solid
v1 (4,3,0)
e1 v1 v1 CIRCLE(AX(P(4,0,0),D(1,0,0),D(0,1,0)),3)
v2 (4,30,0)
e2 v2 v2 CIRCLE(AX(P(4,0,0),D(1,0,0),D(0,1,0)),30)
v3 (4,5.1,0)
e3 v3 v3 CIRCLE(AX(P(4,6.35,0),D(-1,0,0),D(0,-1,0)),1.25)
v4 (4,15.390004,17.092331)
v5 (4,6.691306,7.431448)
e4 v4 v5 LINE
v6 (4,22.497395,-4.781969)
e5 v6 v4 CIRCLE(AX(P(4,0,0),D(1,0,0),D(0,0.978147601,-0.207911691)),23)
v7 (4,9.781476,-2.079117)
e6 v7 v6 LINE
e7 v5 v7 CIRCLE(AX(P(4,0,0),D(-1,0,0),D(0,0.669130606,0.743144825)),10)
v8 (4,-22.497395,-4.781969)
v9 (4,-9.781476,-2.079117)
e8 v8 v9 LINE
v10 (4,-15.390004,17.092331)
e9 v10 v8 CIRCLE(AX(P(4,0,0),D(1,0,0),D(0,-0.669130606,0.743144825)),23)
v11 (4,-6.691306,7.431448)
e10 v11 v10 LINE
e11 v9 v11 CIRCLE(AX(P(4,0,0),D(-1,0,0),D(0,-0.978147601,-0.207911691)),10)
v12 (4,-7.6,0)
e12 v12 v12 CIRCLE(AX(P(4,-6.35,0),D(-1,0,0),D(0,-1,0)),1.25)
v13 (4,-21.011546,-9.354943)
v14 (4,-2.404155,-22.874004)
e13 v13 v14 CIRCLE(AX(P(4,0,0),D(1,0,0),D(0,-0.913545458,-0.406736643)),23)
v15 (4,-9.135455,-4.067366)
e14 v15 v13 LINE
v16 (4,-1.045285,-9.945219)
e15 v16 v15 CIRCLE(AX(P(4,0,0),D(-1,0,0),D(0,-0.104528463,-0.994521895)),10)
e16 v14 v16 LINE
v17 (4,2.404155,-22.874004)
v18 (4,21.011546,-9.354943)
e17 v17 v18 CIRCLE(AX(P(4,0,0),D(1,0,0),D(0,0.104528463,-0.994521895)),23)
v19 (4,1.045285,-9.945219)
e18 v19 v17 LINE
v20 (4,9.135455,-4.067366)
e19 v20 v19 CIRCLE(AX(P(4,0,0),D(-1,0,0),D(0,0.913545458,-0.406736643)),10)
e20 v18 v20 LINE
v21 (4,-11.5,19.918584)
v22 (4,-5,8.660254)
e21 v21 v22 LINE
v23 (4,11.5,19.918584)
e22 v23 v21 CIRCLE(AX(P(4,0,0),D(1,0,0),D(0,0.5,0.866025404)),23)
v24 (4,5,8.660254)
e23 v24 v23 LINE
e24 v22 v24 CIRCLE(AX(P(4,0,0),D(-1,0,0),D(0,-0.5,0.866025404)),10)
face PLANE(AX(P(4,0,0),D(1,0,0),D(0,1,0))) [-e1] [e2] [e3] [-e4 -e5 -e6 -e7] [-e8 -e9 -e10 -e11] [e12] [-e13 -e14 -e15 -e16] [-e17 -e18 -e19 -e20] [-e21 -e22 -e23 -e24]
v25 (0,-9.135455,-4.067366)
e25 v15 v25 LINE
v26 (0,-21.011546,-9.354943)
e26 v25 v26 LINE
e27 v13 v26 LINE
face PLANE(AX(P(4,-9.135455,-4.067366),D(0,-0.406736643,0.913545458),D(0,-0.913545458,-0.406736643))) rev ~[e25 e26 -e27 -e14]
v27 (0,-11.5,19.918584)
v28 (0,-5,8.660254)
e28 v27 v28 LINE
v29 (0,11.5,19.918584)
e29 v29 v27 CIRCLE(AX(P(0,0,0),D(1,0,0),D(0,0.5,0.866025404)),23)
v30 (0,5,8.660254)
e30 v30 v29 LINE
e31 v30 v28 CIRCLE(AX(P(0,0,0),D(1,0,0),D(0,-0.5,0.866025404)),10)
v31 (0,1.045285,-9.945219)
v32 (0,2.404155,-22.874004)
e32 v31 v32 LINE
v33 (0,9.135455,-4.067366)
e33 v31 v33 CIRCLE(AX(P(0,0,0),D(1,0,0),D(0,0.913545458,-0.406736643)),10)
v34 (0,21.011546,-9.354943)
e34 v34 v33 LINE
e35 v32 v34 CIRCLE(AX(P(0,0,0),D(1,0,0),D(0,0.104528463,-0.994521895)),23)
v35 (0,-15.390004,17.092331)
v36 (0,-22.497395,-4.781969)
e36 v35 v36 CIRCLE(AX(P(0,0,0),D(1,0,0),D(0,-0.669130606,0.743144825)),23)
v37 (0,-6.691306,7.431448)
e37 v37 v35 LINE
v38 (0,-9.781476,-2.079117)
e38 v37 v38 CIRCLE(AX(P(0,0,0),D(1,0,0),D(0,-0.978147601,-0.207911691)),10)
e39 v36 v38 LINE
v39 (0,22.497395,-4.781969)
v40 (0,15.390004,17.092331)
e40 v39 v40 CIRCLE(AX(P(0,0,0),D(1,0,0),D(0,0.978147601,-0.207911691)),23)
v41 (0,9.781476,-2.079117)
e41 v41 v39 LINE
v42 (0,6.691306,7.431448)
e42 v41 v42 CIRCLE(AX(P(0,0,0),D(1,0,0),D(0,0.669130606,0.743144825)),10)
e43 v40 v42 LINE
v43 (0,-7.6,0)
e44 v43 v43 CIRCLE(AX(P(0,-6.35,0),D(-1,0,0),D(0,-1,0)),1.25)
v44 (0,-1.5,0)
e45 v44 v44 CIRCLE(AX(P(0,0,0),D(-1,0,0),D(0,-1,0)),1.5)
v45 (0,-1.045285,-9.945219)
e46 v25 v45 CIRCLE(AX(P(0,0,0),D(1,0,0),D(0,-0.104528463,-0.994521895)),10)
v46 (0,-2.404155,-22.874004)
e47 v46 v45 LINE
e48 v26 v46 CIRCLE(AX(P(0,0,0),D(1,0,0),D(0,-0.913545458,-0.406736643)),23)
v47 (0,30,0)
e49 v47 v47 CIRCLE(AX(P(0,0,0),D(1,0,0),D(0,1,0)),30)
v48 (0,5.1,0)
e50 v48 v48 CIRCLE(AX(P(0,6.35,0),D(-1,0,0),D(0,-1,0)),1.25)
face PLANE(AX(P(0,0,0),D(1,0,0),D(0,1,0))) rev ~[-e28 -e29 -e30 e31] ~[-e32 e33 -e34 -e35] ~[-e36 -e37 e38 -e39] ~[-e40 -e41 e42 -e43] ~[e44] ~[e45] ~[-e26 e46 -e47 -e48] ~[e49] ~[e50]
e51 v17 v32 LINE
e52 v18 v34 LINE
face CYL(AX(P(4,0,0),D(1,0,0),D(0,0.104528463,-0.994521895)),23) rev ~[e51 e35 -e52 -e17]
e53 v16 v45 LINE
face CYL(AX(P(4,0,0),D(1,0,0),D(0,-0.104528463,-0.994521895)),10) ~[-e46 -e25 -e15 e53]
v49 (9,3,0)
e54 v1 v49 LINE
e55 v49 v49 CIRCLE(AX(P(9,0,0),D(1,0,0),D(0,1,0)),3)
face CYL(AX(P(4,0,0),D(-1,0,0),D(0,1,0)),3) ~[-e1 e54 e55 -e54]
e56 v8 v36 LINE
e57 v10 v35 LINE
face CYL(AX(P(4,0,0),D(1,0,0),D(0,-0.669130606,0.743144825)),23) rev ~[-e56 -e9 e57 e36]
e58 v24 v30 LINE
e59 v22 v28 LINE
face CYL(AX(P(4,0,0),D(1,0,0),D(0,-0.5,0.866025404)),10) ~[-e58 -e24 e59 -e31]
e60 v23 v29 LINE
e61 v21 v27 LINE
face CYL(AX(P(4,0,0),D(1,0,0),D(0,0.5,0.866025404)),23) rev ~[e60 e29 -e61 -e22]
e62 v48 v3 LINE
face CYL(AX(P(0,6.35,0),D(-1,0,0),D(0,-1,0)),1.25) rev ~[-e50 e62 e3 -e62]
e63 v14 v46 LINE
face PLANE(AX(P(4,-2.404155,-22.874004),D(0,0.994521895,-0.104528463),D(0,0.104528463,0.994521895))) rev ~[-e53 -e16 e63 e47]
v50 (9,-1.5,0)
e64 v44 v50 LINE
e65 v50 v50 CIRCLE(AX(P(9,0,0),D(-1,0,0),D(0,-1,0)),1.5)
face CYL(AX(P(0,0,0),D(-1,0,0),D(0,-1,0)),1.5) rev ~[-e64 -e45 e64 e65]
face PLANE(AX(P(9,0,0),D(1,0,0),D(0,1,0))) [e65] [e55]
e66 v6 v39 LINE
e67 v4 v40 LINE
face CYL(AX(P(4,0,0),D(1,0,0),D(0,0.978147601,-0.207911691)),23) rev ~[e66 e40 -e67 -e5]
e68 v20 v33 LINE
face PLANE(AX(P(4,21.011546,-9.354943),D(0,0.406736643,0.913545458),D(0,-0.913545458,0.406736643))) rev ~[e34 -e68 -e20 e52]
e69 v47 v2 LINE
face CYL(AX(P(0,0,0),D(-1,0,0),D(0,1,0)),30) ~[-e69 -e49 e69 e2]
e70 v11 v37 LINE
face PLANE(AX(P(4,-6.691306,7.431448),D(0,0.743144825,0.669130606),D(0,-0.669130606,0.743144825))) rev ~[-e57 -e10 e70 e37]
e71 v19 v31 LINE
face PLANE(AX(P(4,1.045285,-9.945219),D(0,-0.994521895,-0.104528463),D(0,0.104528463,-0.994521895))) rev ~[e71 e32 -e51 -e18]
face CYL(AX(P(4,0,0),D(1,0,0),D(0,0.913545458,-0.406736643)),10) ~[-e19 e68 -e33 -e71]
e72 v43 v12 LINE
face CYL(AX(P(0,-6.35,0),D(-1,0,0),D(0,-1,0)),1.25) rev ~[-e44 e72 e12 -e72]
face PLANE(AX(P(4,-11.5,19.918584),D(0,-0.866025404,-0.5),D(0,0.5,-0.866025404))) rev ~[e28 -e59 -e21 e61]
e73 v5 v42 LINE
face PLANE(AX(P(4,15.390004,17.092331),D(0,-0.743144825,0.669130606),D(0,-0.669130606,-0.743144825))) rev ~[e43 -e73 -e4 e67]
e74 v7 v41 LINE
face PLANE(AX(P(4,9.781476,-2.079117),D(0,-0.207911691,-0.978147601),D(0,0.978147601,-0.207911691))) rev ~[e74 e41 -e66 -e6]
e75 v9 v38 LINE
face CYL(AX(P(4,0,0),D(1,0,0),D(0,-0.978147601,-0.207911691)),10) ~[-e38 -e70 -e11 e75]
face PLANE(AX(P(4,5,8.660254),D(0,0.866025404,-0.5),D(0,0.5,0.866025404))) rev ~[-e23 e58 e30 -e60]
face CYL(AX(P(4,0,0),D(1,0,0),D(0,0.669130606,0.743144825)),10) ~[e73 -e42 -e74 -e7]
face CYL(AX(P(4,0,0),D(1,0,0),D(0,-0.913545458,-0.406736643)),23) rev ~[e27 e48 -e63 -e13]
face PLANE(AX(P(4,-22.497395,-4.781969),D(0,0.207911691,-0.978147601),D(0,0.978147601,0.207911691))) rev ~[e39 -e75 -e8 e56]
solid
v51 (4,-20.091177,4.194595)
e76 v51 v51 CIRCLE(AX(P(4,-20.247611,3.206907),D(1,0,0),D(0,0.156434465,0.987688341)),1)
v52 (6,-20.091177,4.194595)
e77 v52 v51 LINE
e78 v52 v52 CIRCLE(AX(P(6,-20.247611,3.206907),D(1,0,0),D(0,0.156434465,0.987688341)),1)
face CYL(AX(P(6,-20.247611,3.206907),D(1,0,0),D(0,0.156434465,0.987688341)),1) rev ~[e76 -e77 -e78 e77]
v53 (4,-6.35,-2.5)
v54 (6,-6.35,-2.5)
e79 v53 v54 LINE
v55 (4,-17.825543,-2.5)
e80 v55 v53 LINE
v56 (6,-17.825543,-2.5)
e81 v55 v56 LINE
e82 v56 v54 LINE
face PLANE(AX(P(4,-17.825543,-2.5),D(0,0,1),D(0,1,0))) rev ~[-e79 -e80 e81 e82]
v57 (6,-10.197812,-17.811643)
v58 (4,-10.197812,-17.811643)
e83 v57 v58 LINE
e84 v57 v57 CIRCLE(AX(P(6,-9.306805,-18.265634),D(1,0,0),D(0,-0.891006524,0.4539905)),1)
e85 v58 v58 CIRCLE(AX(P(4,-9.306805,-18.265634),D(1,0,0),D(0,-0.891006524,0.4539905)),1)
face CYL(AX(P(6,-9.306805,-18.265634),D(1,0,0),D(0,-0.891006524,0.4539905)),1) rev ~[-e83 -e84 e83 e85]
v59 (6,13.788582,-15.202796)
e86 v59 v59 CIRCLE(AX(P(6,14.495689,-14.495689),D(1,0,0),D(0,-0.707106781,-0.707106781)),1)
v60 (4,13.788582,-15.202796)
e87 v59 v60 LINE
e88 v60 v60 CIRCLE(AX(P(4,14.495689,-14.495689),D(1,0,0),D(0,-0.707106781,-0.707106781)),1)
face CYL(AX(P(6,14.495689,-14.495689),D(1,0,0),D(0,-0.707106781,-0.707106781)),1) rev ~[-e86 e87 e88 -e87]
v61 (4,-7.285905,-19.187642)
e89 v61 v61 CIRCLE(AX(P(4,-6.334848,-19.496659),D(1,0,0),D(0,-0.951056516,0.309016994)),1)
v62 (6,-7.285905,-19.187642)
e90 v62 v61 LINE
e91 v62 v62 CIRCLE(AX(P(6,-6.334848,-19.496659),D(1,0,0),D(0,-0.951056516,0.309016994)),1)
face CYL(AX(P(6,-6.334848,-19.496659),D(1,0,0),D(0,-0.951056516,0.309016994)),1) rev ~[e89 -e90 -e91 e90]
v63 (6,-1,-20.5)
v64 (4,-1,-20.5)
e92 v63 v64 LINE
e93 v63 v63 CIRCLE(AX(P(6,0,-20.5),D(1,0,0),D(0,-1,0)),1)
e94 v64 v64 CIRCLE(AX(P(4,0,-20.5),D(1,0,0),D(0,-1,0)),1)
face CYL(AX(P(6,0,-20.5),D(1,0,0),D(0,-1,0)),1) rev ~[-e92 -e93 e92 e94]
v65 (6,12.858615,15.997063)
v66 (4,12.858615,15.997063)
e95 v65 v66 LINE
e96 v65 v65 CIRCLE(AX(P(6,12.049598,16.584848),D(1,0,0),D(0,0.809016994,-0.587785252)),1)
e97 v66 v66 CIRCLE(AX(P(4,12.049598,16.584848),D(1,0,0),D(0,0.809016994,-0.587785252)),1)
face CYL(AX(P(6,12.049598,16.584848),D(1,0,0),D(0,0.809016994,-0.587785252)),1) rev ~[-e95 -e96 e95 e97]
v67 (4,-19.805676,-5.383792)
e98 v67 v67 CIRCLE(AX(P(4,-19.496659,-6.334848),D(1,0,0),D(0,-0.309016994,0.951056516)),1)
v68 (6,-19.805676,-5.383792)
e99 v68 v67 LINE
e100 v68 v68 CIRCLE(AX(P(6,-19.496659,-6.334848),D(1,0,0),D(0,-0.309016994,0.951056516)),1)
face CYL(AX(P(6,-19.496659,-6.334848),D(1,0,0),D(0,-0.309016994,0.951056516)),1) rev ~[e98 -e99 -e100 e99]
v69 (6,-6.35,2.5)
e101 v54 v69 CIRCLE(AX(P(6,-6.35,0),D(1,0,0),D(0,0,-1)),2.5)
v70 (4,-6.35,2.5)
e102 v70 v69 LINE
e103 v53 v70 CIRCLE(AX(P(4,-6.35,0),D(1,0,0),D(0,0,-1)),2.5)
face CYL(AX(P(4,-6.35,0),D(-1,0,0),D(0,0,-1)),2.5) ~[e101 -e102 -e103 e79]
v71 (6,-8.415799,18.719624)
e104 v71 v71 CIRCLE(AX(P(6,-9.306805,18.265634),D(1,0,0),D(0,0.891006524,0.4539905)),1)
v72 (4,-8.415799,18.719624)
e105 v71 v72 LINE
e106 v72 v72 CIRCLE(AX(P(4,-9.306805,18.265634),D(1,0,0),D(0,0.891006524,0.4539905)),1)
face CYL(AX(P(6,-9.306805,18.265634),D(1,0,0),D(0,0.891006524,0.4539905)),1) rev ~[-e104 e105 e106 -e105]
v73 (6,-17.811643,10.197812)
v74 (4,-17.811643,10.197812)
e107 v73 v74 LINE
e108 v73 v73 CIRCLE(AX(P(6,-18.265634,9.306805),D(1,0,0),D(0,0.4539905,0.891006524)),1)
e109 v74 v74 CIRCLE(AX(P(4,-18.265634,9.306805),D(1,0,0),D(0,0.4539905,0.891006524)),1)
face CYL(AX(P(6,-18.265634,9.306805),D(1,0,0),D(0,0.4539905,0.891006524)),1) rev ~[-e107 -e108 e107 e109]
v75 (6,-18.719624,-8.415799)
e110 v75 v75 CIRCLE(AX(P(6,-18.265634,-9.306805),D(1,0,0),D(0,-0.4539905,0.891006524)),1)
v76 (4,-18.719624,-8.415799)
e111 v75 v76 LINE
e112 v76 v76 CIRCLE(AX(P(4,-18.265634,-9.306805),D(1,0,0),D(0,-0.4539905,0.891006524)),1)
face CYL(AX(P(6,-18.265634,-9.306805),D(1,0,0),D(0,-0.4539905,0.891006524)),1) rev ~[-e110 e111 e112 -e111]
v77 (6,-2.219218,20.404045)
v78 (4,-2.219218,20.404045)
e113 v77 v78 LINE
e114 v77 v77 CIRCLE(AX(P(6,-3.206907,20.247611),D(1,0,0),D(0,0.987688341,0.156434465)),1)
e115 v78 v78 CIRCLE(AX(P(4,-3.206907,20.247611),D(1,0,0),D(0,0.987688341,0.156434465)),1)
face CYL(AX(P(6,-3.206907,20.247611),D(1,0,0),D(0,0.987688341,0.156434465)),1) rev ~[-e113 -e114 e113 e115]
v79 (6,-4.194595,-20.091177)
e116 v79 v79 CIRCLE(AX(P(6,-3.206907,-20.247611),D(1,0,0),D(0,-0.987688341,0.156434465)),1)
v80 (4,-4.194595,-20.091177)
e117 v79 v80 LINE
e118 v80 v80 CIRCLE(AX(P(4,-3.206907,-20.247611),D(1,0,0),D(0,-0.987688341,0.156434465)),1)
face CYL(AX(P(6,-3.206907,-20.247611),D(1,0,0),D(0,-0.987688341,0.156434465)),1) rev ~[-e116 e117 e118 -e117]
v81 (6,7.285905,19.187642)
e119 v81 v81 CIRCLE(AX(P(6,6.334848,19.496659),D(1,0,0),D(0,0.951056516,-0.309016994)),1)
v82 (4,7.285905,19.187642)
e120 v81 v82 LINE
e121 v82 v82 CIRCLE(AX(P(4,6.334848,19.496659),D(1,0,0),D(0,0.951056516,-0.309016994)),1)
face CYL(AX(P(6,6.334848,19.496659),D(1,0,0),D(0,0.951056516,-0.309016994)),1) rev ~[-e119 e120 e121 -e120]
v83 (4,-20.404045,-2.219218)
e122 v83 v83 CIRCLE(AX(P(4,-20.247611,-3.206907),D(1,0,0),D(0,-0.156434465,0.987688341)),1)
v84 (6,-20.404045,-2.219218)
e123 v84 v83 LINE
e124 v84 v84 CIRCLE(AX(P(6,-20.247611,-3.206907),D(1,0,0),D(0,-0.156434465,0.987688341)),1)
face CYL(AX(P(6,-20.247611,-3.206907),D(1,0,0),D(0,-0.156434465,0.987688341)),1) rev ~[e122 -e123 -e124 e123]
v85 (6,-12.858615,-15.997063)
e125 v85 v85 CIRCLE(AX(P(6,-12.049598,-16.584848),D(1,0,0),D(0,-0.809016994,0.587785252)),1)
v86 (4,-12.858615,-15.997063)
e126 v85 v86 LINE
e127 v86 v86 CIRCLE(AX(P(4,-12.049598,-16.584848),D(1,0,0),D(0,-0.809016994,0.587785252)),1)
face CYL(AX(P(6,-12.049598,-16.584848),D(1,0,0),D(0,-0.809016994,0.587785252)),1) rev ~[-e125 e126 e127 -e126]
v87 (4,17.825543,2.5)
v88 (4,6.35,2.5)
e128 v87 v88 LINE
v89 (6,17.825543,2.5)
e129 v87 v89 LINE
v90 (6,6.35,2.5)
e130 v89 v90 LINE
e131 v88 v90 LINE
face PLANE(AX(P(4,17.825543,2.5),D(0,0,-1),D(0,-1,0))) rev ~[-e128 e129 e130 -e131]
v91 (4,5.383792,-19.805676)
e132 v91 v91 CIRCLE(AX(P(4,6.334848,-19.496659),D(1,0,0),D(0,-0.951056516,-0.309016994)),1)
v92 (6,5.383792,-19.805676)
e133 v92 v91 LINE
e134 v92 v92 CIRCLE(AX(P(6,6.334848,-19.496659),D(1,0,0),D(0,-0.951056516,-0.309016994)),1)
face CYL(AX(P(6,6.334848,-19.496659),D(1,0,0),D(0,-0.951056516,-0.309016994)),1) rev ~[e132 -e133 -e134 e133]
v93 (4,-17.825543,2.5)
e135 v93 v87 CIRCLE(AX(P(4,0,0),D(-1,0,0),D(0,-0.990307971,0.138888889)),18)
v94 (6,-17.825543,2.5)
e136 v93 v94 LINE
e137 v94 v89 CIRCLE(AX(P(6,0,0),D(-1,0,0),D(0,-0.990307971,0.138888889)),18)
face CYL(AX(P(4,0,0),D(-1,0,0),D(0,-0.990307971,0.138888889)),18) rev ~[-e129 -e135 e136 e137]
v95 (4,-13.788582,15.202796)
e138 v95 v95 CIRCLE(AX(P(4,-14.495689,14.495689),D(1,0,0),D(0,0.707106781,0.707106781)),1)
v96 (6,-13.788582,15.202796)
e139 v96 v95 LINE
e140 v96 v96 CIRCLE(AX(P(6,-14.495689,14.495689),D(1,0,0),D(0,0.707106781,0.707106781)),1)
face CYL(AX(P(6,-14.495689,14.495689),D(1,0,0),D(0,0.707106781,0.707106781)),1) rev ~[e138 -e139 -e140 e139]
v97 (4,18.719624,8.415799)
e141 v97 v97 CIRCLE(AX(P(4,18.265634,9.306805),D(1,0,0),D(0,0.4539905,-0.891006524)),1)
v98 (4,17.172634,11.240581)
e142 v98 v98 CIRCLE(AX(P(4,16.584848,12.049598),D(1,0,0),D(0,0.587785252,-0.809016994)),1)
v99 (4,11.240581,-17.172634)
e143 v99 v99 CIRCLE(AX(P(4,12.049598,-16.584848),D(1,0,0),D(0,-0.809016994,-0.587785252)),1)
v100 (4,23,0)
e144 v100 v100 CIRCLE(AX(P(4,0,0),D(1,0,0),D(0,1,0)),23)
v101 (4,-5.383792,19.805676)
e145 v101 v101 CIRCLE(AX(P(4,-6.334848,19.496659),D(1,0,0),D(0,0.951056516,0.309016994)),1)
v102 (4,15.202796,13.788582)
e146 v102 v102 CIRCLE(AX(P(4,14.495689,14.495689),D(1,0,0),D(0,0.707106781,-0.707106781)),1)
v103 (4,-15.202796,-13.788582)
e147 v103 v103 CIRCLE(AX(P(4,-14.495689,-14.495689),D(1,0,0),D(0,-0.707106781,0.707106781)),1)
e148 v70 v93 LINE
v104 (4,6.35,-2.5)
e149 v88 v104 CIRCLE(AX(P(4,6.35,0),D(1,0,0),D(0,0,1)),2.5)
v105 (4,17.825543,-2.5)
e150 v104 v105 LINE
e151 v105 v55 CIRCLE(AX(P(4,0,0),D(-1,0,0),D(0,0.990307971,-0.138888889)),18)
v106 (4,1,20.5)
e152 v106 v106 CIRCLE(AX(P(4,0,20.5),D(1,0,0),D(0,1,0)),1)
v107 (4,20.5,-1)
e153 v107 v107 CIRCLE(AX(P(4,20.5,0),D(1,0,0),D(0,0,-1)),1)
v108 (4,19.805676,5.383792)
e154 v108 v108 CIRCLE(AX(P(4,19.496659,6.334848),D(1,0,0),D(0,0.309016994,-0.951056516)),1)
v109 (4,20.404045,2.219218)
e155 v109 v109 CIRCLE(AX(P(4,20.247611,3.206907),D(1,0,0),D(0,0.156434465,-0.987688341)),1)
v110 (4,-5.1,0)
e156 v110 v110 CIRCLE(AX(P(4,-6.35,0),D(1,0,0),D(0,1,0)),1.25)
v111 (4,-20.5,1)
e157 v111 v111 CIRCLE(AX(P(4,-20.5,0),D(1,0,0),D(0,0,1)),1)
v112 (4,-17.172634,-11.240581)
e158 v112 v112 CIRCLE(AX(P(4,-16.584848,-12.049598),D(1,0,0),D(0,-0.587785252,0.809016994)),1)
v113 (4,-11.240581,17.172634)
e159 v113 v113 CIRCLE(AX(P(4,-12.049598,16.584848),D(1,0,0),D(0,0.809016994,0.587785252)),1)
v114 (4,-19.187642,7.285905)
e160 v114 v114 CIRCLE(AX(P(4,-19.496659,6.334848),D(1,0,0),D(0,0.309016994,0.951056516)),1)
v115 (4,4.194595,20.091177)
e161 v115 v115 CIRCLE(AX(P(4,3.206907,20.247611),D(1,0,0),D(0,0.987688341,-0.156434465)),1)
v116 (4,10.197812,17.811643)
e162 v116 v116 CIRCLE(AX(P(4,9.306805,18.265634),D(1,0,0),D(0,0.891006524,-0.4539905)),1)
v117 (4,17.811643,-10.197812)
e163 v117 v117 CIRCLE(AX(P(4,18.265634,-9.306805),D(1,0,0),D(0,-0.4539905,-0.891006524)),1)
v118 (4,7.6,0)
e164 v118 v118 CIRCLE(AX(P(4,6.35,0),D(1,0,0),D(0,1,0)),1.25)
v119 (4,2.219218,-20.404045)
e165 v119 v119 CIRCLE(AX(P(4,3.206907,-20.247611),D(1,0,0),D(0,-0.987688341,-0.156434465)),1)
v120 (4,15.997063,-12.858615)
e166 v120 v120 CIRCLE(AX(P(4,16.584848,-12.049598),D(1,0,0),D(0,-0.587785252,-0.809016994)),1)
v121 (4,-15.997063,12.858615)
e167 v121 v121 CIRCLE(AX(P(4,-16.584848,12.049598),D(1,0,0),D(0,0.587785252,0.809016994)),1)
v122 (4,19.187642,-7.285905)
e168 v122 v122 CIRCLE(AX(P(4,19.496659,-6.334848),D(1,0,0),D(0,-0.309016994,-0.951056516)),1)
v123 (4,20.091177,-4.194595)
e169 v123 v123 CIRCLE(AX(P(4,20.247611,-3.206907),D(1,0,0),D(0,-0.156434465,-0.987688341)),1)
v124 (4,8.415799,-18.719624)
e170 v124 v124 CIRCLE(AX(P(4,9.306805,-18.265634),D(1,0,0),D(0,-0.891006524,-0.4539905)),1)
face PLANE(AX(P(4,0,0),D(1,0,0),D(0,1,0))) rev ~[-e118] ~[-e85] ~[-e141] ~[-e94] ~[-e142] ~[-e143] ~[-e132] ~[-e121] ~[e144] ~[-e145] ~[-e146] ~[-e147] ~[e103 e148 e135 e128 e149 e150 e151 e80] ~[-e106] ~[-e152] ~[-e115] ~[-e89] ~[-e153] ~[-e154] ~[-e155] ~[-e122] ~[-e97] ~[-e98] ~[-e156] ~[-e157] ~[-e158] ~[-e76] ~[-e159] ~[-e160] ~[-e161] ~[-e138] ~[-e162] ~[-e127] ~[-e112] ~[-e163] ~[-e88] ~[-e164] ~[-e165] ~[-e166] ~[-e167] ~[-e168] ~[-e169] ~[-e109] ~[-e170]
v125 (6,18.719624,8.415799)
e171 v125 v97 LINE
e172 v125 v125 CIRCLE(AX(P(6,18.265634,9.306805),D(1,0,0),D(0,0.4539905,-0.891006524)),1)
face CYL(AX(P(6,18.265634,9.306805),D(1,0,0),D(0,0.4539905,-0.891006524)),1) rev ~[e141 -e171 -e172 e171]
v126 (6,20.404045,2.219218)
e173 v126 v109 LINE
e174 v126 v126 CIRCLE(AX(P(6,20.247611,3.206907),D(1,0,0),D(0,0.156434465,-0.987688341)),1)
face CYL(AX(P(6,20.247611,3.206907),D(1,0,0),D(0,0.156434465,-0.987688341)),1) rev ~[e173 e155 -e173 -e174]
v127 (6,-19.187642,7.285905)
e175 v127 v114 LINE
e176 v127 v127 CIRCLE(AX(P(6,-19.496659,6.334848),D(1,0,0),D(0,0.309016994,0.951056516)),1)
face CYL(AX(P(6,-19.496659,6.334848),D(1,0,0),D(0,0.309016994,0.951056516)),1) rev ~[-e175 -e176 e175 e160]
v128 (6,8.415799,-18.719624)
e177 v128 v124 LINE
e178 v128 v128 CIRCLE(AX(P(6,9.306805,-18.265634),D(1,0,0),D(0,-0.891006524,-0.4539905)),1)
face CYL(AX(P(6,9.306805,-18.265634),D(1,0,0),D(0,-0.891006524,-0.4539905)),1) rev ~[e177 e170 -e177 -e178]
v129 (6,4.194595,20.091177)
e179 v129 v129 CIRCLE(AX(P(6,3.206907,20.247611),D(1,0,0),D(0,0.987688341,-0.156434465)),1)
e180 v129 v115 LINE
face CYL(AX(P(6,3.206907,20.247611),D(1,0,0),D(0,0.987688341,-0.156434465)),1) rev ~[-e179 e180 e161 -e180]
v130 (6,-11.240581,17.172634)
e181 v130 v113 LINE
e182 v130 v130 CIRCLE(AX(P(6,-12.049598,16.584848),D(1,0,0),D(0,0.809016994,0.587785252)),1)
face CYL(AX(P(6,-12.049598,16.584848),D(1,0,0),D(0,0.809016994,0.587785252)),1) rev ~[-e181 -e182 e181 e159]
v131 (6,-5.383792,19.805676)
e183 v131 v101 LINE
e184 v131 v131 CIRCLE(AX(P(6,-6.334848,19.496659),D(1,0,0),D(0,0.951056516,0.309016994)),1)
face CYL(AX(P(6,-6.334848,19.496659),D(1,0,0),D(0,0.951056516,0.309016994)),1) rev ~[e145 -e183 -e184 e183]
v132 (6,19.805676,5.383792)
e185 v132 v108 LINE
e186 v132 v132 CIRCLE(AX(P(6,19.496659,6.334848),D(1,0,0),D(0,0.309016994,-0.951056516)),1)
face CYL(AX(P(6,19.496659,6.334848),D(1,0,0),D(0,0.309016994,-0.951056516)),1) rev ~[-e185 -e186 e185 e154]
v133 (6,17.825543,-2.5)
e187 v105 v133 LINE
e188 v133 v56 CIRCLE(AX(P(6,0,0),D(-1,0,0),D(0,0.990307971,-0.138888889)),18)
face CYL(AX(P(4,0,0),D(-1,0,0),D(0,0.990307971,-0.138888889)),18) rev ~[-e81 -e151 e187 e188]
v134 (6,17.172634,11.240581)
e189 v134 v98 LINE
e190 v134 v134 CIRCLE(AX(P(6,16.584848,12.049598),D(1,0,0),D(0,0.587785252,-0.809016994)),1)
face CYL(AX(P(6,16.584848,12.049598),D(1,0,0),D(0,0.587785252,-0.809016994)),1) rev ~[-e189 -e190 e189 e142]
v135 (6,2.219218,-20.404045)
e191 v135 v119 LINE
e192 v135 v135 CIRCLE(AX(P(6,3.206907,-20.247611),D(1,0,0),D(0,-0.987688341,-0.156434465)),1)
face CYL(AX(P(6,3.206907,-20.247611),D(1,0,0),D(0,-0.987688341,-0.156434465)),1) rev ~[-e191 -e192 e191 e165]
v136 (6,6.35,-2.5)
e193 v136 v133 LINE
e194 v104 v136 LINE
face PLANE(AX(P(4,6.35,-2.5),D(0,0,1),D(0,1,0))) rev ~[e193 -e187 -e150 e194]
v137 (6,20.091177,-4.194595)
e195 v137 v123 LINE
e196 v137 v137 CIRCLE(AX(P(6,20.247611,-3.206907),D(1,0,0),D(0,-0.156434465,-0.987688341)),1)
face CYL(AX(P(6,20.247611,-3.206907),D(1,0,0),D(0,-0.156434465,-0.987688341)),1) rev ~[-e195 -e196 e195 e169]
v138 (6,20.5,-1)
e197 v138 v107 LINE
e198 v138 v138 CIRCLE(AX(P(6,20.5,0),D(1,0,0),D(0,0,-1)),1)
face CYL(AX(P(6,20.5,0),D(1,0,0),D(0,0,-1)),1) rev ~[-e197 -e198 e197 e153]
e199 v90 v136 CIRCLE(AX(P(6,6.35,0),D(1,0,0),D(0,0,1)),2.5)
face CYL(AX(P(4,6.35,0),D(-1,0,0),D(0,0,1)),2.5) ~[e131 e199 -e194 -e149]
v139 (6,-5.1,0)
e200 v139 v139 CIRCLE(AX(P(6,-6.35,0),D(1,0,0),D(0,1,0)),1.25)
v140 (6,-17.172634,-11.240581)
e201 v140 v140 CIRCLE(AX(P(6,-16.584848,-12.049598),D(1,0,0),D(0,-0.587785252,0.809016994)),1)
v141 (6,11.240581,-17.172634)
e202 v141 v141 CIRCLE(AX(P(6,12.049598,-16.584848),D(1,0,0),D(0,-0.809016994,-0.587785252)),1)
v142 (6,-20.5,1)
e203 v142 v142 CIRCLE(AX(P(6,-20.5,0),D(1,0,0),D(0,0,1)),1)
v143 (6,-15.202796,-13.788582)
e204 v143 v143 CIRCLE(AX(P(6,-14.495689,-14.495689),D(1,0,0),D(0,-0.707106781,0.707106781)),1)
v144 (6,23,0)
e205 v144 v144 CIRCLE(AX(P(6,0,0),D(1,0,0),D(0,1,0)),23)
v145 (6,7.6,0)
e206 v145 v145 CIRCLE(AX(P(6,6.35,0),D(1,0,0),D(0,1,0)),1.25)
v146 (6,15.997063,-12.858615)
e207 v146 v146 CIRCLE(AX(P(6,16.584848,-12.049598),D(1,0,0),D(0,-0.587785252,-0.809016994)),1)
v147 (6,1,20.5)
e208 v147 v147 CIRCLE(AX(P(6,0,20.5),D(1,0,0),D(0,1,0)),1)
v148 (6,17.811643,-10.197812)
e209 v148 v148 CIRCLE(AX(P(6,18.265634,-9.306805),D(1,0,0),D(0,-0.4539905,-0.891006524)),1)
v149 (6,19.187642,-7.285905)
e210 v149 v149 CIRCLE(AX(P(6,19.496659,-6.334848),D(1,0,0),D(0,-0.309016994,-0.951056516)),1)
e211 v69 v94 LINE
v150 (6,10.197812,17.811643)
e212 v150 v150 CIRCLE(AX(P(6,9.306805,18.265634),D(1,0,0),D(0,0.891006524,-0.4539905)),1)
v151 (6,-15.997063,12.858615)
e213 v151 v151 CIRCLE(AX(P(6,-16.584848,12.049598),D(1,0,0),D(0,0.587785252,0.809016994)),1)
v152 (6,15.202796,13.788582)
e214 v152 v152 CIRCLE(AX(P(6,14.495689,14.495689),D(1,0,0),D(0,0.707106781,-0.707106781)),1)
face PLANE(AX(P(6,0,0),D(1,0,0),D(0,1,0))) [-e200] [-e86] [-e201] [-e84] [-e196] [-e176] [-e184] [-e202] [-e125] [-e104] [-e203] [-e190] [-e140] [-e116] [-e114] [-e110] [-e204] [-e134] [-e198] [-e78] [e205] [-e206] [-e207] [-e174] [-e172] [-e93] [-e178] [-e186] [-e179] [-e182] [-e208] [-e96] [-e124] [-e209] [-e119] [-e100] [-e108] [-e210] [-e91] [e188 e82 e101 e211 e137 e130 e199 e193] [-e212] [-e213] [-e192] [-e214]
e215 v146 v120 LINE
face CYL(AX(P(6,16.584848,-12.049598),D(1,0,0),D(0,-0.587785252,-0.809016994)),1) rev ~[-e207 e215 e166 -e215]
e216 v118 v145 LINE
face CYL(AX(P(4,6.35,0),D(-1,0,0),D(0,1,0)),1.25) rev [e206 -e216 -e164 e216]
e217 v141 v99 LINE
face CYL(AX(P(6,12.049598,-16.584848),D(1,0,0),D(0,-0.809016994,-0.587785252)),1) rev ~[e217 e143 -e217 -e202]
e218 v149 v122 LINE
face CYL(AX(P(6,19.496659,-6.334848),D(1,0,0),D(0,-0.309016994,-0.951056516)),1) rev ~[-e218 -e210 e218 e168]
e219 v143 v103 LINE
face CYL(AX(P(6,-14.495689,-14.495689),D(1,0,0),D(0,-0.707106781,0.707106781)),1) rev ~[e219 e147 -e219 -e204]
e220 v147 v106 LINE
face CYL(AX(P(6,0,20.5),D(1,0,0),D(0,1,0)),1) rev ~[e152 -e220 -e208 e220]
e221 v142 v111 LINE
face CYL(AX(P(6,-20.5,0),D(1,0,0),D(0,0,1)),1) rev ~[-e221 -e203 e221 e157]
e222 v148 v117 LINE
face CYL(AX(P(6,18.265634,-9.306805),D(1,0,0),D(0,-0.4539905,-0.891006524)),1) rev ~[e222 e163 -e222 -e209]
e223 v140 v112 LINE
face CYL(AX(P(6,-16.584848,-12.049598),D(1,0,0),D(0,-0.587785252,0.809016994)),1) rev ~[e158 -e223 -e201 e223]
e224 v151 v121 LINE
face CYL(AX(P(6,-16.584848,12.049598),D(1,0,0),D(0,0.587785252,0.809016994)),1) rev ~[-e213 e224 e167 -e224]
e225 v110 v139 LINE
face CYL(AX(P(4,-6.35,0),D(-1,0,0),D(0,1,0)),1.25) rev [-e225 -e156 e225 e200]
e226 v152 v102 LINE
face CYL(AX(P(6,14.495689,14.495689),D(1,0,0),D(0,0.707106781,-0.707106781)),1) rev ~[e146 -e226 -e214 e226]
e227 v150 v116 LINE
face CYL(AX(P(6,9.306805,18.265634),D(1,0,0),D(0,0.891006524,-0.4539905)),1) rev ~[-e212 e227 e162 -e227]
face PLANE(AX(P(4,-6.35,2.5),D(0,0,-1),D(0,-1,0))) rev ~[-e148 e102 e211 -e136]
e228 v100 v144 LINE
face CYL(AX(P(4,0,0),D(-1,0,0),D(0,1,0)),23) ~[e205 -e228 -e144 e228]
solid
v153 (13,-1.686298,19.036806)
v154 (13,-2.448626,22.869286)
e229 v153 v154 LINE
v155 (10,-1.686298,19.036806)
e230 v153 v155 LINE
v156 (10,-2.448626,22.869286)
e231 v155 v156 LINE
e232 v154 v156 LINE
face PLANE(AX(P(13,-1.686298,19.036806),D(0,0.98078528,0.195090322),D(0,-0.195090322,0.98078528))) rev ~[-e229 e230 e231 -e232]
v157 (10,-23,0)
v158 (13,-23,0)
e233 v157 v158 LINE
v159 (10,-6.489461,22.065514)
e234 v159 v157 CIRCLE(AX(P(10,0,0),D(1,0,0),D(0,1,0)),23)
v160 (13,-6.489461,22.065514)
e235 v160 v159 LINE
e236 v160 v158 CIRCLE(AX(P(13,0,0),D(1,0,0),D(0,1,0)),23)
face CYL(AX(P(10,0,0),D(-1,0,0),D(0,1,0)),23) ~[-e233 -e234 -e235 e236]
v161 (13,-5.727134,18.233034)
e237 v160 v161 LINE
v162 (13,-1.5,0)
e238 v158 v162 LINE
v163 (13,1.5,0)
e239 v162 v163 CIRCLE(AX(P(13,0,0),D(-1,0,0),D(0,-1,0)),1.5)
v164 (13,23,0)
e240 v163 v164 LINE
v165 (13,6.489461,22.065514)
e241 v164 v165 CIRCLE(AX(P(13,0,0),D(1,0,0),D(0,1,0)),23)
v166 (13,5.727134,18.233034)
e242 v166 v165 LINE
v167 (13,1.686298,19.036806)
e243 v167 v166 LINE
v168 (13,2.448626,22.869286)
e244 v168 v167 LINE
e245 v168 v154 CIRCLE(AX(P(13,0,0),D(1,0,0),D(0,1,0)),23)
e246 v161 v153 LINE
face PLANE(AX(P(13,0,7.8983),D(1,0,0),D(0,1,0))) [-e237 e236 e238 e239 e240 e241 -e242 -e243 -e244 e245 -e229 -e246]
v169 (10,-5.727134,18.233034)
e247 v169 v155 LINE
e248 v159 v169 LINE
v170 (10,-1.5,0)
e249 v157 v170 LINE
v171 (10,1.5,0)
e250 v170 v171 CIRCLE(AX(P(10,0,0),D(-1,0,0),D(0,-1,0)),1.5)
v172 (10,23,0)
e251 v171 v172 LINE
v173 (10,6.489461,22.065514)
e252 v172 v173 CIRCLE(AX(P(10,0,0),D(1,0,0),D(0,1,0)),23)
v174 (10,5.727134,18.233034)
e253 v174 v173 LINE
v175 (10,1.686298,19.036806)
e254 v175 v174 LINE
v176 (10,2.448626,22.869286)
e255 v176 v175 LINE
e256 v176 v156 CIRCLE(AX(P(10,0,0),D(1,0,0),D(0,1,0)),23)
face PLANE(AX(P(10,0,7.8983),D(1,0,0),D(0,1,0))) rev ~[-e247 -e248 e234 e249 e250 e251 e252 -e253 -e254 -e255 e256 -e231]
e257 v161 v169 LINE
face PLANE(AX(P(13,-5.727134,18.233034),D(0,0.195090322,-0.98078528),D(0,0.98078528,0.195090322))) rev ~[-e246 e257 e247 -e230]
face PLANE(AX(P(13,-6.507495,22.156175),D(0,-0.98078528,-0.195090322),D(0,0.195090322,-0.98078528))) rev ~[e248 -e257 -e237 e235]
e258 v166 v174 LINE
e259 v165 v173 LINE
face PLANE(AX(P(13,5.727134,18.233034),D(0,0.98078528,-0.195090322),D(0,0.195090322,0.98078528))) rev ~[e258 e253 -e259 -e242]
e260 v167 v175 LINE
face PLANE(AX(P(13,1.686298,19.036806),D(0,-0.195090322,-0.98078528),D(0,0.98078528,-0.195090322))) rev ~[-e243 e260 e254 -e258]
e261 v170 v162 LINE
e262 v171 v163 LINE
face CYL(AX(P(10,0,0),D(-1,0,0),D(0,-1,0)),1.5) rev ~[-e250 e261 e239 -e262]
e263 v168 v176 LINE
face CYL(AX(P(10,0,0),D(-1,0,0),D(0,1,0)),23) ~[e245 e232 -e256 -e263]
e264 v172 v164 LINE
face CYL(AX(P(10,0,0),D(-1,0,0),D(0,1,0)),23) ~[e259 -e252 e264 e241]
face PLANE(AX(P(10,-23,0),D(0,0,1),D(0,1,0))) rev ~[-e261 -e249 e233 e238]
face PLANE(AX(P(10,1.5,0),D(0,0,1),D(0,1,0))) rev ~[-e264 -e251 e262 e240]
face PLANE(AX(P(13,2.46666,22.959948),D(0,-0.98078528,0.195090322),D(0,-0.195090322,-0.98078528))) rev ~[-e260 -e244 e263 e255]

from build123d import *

# Parameters (mm, degrees)
F0_R             = 30
F1_DEPTH         = 4
F2_R             = 3
F3_DEPTH         = 5
F4_R             = 1.25
F4_R_2           = 1.5
F5_DEPTH         = 9.001
F7_DEPTH         = 4.001
F7_COPIES_COUNT  = 5
F8_R             = 23
F8_R_2           = 1.25
F9_DEPTH         = 2
F10_R            = 1
F11_DEPTH        = 6.001
F11_COPIES_COUNT = 40
F14_DEPTH        = 3
F16_DEPTH        = 13.001


# Not quite as in the source:
# - a pattern or mirror of a feature is missing from the dataset's text; its kind, count and spacing are read off the source's solid


with BuildPart() as f1:
    # F0 (on Right) → F1 (new body)
    with BuildSketch(Plane.YZ):
        Circle(F0_R)
    extrude(amount=F1_DEPTH)

    # F2 (on face) → F3 (join)
    with BuildSketch(Plane.YZ.offset(4)):
        Circle(F2_R)
    extrude(amount=F3_DEPTH)

    # F4 (on face) → F5 (cut, through all)
    with BuildSketch(Plane(origin=(0, 0, 0), x_dir=(0, -1, 0), z_dir=(-1, 0, 0))):
        with Locations((-6.35, 0)):
            Circle(F4_R)
        with Locations((6.35, 0)):
            Circle(F4_R)
        Circle(F4_R_2)
    extrude(amount=-F5_DEPTH, mode=Mode.SUBTRACT)

    # F6 (on face) → F7 (cut, through all)
    with BuildSketch(Plane.YZ.offset(4)):
        with BuildLine():
            Line((5, 8.6602540378), (11.5, 19.918584287))
            ThreePointArc((11.5, 19.918584287), (0, 23), (-11.5, 19.918584287))
            Line((-11.5, 19.918584287), (-5, 8.6602540378))
            ThreePointArc((-5, 8.6602540378), (0, 10), (5, 8.6602540378))
        make_face()
    f7 = extrude(amount=-F7_DEPTH, mode=Mode.SUBTRACT)

    # F7_copies: F7 ×5 about axis
    f7_copies_axis = Axis((0, 0, 0), (1, 0, 0))
    for i in range(1, F7_COPIES_COUNT):
        add(f7.rotate(f7_copies_axis, i * 360 / F7_COPIES_COUNT), mode=Mode.SUBTRACT)


with BuildPart() as f9:
    # F8 (on face) → F9 (new body)
    with BuildSketch(Plane.YZ.offset(4)):
        Circle(F8_R)
        with Locations((-6.35, 0)):
            Circle(F8_R_2, mode=Mode.SUBTRACT)
        with BuildLine():
            ThreePointArc((17.82554347, -2.5), (0, -18), (-17.82554347, -2.5))
            Line((-17.82554347, -2.5), (-6.35, -2.5))
            ThreePointArc((-6.35, -2.5), (-3.85, 0), (-6.35, 2.5))
            Line((-6.35, 2.5), (-17.82554347, 2.5))
            ThreePointArc((-17.82554347, 2.5), (0, 18), (17.82554347, 2.5))
            Line((17.82554347, 2.5), (6.35, 2.5))
            ThreePointArc((6.35, 2.5), (3.85, 0), (6.35, -2.5))
            Line((6.35, -2.5), (17.82554347, -2.5))
        make_face(mode=Mode.SUBTRACT)
        with Locations((6.35, 0)):
            Circle(F8_R_2, mode=Mode.SUBTRACT)
    extrude(amount=F9_DEPTH)

    # F10 (on face) → F11 (cut, through all)
    with BuildSketch(Plane.YZ.offset(6)):
        with Locations((0, 20.5)):
            Circle(F10_R)
    f11 = extrude(amount=-F11_DEPTH, mode=Mode.SUBTRACT)

    # F11_copies: F11 ×40 about axis
    f11_copies_axis = Axis((0, 0, 0), (1, 0, 0))
    for i in range(1, F11_COPIES_COUNT):
        add(f11.rotate(f11_copies_axis, i * 360 / F11_COPIES_COUNT), mode=Mode.SUBTRACT)


with BuildPart() as f14:
    # F13 (on offset) → F14 (new body)
    with BuildSketch(Plane.YZ.offset(10)):
        with BuildLine():
            Line((1.5, 0), (23, 0))
            ThreePointArc((23, 0), (0, 23), (-23, 0))
            Line((-23, 0), (-1.5, 0))
            ThreePointArc((-1.5, 0), (0, 1.5), (1.5, 0))
        make_face()
    extrude(amount=F14_DEPTH)

    # F15 (on face) → F16 (cut, through all)
    with BuildSketch(Plane.YZ.offset(13)):
        Polygon((-2.4666597287, 22.9599475126), (-6.507495084, 22.1561753859), (-5.7271337959, 18.2330342643), (-1.6862984407, 19.036806391), align=None)
        Polygon((2.4666597287, 22.9599475126), (1.6862984407, 19.036806391), (5.7271337959, 18.2330342643), (6.507495084, 22.1561753859), align=None)
    extrude(amount=-F16_DEPTH, mode=Mode.SUBTRACT)


solid = Compound([f1.part, f9.part, f14.part])
